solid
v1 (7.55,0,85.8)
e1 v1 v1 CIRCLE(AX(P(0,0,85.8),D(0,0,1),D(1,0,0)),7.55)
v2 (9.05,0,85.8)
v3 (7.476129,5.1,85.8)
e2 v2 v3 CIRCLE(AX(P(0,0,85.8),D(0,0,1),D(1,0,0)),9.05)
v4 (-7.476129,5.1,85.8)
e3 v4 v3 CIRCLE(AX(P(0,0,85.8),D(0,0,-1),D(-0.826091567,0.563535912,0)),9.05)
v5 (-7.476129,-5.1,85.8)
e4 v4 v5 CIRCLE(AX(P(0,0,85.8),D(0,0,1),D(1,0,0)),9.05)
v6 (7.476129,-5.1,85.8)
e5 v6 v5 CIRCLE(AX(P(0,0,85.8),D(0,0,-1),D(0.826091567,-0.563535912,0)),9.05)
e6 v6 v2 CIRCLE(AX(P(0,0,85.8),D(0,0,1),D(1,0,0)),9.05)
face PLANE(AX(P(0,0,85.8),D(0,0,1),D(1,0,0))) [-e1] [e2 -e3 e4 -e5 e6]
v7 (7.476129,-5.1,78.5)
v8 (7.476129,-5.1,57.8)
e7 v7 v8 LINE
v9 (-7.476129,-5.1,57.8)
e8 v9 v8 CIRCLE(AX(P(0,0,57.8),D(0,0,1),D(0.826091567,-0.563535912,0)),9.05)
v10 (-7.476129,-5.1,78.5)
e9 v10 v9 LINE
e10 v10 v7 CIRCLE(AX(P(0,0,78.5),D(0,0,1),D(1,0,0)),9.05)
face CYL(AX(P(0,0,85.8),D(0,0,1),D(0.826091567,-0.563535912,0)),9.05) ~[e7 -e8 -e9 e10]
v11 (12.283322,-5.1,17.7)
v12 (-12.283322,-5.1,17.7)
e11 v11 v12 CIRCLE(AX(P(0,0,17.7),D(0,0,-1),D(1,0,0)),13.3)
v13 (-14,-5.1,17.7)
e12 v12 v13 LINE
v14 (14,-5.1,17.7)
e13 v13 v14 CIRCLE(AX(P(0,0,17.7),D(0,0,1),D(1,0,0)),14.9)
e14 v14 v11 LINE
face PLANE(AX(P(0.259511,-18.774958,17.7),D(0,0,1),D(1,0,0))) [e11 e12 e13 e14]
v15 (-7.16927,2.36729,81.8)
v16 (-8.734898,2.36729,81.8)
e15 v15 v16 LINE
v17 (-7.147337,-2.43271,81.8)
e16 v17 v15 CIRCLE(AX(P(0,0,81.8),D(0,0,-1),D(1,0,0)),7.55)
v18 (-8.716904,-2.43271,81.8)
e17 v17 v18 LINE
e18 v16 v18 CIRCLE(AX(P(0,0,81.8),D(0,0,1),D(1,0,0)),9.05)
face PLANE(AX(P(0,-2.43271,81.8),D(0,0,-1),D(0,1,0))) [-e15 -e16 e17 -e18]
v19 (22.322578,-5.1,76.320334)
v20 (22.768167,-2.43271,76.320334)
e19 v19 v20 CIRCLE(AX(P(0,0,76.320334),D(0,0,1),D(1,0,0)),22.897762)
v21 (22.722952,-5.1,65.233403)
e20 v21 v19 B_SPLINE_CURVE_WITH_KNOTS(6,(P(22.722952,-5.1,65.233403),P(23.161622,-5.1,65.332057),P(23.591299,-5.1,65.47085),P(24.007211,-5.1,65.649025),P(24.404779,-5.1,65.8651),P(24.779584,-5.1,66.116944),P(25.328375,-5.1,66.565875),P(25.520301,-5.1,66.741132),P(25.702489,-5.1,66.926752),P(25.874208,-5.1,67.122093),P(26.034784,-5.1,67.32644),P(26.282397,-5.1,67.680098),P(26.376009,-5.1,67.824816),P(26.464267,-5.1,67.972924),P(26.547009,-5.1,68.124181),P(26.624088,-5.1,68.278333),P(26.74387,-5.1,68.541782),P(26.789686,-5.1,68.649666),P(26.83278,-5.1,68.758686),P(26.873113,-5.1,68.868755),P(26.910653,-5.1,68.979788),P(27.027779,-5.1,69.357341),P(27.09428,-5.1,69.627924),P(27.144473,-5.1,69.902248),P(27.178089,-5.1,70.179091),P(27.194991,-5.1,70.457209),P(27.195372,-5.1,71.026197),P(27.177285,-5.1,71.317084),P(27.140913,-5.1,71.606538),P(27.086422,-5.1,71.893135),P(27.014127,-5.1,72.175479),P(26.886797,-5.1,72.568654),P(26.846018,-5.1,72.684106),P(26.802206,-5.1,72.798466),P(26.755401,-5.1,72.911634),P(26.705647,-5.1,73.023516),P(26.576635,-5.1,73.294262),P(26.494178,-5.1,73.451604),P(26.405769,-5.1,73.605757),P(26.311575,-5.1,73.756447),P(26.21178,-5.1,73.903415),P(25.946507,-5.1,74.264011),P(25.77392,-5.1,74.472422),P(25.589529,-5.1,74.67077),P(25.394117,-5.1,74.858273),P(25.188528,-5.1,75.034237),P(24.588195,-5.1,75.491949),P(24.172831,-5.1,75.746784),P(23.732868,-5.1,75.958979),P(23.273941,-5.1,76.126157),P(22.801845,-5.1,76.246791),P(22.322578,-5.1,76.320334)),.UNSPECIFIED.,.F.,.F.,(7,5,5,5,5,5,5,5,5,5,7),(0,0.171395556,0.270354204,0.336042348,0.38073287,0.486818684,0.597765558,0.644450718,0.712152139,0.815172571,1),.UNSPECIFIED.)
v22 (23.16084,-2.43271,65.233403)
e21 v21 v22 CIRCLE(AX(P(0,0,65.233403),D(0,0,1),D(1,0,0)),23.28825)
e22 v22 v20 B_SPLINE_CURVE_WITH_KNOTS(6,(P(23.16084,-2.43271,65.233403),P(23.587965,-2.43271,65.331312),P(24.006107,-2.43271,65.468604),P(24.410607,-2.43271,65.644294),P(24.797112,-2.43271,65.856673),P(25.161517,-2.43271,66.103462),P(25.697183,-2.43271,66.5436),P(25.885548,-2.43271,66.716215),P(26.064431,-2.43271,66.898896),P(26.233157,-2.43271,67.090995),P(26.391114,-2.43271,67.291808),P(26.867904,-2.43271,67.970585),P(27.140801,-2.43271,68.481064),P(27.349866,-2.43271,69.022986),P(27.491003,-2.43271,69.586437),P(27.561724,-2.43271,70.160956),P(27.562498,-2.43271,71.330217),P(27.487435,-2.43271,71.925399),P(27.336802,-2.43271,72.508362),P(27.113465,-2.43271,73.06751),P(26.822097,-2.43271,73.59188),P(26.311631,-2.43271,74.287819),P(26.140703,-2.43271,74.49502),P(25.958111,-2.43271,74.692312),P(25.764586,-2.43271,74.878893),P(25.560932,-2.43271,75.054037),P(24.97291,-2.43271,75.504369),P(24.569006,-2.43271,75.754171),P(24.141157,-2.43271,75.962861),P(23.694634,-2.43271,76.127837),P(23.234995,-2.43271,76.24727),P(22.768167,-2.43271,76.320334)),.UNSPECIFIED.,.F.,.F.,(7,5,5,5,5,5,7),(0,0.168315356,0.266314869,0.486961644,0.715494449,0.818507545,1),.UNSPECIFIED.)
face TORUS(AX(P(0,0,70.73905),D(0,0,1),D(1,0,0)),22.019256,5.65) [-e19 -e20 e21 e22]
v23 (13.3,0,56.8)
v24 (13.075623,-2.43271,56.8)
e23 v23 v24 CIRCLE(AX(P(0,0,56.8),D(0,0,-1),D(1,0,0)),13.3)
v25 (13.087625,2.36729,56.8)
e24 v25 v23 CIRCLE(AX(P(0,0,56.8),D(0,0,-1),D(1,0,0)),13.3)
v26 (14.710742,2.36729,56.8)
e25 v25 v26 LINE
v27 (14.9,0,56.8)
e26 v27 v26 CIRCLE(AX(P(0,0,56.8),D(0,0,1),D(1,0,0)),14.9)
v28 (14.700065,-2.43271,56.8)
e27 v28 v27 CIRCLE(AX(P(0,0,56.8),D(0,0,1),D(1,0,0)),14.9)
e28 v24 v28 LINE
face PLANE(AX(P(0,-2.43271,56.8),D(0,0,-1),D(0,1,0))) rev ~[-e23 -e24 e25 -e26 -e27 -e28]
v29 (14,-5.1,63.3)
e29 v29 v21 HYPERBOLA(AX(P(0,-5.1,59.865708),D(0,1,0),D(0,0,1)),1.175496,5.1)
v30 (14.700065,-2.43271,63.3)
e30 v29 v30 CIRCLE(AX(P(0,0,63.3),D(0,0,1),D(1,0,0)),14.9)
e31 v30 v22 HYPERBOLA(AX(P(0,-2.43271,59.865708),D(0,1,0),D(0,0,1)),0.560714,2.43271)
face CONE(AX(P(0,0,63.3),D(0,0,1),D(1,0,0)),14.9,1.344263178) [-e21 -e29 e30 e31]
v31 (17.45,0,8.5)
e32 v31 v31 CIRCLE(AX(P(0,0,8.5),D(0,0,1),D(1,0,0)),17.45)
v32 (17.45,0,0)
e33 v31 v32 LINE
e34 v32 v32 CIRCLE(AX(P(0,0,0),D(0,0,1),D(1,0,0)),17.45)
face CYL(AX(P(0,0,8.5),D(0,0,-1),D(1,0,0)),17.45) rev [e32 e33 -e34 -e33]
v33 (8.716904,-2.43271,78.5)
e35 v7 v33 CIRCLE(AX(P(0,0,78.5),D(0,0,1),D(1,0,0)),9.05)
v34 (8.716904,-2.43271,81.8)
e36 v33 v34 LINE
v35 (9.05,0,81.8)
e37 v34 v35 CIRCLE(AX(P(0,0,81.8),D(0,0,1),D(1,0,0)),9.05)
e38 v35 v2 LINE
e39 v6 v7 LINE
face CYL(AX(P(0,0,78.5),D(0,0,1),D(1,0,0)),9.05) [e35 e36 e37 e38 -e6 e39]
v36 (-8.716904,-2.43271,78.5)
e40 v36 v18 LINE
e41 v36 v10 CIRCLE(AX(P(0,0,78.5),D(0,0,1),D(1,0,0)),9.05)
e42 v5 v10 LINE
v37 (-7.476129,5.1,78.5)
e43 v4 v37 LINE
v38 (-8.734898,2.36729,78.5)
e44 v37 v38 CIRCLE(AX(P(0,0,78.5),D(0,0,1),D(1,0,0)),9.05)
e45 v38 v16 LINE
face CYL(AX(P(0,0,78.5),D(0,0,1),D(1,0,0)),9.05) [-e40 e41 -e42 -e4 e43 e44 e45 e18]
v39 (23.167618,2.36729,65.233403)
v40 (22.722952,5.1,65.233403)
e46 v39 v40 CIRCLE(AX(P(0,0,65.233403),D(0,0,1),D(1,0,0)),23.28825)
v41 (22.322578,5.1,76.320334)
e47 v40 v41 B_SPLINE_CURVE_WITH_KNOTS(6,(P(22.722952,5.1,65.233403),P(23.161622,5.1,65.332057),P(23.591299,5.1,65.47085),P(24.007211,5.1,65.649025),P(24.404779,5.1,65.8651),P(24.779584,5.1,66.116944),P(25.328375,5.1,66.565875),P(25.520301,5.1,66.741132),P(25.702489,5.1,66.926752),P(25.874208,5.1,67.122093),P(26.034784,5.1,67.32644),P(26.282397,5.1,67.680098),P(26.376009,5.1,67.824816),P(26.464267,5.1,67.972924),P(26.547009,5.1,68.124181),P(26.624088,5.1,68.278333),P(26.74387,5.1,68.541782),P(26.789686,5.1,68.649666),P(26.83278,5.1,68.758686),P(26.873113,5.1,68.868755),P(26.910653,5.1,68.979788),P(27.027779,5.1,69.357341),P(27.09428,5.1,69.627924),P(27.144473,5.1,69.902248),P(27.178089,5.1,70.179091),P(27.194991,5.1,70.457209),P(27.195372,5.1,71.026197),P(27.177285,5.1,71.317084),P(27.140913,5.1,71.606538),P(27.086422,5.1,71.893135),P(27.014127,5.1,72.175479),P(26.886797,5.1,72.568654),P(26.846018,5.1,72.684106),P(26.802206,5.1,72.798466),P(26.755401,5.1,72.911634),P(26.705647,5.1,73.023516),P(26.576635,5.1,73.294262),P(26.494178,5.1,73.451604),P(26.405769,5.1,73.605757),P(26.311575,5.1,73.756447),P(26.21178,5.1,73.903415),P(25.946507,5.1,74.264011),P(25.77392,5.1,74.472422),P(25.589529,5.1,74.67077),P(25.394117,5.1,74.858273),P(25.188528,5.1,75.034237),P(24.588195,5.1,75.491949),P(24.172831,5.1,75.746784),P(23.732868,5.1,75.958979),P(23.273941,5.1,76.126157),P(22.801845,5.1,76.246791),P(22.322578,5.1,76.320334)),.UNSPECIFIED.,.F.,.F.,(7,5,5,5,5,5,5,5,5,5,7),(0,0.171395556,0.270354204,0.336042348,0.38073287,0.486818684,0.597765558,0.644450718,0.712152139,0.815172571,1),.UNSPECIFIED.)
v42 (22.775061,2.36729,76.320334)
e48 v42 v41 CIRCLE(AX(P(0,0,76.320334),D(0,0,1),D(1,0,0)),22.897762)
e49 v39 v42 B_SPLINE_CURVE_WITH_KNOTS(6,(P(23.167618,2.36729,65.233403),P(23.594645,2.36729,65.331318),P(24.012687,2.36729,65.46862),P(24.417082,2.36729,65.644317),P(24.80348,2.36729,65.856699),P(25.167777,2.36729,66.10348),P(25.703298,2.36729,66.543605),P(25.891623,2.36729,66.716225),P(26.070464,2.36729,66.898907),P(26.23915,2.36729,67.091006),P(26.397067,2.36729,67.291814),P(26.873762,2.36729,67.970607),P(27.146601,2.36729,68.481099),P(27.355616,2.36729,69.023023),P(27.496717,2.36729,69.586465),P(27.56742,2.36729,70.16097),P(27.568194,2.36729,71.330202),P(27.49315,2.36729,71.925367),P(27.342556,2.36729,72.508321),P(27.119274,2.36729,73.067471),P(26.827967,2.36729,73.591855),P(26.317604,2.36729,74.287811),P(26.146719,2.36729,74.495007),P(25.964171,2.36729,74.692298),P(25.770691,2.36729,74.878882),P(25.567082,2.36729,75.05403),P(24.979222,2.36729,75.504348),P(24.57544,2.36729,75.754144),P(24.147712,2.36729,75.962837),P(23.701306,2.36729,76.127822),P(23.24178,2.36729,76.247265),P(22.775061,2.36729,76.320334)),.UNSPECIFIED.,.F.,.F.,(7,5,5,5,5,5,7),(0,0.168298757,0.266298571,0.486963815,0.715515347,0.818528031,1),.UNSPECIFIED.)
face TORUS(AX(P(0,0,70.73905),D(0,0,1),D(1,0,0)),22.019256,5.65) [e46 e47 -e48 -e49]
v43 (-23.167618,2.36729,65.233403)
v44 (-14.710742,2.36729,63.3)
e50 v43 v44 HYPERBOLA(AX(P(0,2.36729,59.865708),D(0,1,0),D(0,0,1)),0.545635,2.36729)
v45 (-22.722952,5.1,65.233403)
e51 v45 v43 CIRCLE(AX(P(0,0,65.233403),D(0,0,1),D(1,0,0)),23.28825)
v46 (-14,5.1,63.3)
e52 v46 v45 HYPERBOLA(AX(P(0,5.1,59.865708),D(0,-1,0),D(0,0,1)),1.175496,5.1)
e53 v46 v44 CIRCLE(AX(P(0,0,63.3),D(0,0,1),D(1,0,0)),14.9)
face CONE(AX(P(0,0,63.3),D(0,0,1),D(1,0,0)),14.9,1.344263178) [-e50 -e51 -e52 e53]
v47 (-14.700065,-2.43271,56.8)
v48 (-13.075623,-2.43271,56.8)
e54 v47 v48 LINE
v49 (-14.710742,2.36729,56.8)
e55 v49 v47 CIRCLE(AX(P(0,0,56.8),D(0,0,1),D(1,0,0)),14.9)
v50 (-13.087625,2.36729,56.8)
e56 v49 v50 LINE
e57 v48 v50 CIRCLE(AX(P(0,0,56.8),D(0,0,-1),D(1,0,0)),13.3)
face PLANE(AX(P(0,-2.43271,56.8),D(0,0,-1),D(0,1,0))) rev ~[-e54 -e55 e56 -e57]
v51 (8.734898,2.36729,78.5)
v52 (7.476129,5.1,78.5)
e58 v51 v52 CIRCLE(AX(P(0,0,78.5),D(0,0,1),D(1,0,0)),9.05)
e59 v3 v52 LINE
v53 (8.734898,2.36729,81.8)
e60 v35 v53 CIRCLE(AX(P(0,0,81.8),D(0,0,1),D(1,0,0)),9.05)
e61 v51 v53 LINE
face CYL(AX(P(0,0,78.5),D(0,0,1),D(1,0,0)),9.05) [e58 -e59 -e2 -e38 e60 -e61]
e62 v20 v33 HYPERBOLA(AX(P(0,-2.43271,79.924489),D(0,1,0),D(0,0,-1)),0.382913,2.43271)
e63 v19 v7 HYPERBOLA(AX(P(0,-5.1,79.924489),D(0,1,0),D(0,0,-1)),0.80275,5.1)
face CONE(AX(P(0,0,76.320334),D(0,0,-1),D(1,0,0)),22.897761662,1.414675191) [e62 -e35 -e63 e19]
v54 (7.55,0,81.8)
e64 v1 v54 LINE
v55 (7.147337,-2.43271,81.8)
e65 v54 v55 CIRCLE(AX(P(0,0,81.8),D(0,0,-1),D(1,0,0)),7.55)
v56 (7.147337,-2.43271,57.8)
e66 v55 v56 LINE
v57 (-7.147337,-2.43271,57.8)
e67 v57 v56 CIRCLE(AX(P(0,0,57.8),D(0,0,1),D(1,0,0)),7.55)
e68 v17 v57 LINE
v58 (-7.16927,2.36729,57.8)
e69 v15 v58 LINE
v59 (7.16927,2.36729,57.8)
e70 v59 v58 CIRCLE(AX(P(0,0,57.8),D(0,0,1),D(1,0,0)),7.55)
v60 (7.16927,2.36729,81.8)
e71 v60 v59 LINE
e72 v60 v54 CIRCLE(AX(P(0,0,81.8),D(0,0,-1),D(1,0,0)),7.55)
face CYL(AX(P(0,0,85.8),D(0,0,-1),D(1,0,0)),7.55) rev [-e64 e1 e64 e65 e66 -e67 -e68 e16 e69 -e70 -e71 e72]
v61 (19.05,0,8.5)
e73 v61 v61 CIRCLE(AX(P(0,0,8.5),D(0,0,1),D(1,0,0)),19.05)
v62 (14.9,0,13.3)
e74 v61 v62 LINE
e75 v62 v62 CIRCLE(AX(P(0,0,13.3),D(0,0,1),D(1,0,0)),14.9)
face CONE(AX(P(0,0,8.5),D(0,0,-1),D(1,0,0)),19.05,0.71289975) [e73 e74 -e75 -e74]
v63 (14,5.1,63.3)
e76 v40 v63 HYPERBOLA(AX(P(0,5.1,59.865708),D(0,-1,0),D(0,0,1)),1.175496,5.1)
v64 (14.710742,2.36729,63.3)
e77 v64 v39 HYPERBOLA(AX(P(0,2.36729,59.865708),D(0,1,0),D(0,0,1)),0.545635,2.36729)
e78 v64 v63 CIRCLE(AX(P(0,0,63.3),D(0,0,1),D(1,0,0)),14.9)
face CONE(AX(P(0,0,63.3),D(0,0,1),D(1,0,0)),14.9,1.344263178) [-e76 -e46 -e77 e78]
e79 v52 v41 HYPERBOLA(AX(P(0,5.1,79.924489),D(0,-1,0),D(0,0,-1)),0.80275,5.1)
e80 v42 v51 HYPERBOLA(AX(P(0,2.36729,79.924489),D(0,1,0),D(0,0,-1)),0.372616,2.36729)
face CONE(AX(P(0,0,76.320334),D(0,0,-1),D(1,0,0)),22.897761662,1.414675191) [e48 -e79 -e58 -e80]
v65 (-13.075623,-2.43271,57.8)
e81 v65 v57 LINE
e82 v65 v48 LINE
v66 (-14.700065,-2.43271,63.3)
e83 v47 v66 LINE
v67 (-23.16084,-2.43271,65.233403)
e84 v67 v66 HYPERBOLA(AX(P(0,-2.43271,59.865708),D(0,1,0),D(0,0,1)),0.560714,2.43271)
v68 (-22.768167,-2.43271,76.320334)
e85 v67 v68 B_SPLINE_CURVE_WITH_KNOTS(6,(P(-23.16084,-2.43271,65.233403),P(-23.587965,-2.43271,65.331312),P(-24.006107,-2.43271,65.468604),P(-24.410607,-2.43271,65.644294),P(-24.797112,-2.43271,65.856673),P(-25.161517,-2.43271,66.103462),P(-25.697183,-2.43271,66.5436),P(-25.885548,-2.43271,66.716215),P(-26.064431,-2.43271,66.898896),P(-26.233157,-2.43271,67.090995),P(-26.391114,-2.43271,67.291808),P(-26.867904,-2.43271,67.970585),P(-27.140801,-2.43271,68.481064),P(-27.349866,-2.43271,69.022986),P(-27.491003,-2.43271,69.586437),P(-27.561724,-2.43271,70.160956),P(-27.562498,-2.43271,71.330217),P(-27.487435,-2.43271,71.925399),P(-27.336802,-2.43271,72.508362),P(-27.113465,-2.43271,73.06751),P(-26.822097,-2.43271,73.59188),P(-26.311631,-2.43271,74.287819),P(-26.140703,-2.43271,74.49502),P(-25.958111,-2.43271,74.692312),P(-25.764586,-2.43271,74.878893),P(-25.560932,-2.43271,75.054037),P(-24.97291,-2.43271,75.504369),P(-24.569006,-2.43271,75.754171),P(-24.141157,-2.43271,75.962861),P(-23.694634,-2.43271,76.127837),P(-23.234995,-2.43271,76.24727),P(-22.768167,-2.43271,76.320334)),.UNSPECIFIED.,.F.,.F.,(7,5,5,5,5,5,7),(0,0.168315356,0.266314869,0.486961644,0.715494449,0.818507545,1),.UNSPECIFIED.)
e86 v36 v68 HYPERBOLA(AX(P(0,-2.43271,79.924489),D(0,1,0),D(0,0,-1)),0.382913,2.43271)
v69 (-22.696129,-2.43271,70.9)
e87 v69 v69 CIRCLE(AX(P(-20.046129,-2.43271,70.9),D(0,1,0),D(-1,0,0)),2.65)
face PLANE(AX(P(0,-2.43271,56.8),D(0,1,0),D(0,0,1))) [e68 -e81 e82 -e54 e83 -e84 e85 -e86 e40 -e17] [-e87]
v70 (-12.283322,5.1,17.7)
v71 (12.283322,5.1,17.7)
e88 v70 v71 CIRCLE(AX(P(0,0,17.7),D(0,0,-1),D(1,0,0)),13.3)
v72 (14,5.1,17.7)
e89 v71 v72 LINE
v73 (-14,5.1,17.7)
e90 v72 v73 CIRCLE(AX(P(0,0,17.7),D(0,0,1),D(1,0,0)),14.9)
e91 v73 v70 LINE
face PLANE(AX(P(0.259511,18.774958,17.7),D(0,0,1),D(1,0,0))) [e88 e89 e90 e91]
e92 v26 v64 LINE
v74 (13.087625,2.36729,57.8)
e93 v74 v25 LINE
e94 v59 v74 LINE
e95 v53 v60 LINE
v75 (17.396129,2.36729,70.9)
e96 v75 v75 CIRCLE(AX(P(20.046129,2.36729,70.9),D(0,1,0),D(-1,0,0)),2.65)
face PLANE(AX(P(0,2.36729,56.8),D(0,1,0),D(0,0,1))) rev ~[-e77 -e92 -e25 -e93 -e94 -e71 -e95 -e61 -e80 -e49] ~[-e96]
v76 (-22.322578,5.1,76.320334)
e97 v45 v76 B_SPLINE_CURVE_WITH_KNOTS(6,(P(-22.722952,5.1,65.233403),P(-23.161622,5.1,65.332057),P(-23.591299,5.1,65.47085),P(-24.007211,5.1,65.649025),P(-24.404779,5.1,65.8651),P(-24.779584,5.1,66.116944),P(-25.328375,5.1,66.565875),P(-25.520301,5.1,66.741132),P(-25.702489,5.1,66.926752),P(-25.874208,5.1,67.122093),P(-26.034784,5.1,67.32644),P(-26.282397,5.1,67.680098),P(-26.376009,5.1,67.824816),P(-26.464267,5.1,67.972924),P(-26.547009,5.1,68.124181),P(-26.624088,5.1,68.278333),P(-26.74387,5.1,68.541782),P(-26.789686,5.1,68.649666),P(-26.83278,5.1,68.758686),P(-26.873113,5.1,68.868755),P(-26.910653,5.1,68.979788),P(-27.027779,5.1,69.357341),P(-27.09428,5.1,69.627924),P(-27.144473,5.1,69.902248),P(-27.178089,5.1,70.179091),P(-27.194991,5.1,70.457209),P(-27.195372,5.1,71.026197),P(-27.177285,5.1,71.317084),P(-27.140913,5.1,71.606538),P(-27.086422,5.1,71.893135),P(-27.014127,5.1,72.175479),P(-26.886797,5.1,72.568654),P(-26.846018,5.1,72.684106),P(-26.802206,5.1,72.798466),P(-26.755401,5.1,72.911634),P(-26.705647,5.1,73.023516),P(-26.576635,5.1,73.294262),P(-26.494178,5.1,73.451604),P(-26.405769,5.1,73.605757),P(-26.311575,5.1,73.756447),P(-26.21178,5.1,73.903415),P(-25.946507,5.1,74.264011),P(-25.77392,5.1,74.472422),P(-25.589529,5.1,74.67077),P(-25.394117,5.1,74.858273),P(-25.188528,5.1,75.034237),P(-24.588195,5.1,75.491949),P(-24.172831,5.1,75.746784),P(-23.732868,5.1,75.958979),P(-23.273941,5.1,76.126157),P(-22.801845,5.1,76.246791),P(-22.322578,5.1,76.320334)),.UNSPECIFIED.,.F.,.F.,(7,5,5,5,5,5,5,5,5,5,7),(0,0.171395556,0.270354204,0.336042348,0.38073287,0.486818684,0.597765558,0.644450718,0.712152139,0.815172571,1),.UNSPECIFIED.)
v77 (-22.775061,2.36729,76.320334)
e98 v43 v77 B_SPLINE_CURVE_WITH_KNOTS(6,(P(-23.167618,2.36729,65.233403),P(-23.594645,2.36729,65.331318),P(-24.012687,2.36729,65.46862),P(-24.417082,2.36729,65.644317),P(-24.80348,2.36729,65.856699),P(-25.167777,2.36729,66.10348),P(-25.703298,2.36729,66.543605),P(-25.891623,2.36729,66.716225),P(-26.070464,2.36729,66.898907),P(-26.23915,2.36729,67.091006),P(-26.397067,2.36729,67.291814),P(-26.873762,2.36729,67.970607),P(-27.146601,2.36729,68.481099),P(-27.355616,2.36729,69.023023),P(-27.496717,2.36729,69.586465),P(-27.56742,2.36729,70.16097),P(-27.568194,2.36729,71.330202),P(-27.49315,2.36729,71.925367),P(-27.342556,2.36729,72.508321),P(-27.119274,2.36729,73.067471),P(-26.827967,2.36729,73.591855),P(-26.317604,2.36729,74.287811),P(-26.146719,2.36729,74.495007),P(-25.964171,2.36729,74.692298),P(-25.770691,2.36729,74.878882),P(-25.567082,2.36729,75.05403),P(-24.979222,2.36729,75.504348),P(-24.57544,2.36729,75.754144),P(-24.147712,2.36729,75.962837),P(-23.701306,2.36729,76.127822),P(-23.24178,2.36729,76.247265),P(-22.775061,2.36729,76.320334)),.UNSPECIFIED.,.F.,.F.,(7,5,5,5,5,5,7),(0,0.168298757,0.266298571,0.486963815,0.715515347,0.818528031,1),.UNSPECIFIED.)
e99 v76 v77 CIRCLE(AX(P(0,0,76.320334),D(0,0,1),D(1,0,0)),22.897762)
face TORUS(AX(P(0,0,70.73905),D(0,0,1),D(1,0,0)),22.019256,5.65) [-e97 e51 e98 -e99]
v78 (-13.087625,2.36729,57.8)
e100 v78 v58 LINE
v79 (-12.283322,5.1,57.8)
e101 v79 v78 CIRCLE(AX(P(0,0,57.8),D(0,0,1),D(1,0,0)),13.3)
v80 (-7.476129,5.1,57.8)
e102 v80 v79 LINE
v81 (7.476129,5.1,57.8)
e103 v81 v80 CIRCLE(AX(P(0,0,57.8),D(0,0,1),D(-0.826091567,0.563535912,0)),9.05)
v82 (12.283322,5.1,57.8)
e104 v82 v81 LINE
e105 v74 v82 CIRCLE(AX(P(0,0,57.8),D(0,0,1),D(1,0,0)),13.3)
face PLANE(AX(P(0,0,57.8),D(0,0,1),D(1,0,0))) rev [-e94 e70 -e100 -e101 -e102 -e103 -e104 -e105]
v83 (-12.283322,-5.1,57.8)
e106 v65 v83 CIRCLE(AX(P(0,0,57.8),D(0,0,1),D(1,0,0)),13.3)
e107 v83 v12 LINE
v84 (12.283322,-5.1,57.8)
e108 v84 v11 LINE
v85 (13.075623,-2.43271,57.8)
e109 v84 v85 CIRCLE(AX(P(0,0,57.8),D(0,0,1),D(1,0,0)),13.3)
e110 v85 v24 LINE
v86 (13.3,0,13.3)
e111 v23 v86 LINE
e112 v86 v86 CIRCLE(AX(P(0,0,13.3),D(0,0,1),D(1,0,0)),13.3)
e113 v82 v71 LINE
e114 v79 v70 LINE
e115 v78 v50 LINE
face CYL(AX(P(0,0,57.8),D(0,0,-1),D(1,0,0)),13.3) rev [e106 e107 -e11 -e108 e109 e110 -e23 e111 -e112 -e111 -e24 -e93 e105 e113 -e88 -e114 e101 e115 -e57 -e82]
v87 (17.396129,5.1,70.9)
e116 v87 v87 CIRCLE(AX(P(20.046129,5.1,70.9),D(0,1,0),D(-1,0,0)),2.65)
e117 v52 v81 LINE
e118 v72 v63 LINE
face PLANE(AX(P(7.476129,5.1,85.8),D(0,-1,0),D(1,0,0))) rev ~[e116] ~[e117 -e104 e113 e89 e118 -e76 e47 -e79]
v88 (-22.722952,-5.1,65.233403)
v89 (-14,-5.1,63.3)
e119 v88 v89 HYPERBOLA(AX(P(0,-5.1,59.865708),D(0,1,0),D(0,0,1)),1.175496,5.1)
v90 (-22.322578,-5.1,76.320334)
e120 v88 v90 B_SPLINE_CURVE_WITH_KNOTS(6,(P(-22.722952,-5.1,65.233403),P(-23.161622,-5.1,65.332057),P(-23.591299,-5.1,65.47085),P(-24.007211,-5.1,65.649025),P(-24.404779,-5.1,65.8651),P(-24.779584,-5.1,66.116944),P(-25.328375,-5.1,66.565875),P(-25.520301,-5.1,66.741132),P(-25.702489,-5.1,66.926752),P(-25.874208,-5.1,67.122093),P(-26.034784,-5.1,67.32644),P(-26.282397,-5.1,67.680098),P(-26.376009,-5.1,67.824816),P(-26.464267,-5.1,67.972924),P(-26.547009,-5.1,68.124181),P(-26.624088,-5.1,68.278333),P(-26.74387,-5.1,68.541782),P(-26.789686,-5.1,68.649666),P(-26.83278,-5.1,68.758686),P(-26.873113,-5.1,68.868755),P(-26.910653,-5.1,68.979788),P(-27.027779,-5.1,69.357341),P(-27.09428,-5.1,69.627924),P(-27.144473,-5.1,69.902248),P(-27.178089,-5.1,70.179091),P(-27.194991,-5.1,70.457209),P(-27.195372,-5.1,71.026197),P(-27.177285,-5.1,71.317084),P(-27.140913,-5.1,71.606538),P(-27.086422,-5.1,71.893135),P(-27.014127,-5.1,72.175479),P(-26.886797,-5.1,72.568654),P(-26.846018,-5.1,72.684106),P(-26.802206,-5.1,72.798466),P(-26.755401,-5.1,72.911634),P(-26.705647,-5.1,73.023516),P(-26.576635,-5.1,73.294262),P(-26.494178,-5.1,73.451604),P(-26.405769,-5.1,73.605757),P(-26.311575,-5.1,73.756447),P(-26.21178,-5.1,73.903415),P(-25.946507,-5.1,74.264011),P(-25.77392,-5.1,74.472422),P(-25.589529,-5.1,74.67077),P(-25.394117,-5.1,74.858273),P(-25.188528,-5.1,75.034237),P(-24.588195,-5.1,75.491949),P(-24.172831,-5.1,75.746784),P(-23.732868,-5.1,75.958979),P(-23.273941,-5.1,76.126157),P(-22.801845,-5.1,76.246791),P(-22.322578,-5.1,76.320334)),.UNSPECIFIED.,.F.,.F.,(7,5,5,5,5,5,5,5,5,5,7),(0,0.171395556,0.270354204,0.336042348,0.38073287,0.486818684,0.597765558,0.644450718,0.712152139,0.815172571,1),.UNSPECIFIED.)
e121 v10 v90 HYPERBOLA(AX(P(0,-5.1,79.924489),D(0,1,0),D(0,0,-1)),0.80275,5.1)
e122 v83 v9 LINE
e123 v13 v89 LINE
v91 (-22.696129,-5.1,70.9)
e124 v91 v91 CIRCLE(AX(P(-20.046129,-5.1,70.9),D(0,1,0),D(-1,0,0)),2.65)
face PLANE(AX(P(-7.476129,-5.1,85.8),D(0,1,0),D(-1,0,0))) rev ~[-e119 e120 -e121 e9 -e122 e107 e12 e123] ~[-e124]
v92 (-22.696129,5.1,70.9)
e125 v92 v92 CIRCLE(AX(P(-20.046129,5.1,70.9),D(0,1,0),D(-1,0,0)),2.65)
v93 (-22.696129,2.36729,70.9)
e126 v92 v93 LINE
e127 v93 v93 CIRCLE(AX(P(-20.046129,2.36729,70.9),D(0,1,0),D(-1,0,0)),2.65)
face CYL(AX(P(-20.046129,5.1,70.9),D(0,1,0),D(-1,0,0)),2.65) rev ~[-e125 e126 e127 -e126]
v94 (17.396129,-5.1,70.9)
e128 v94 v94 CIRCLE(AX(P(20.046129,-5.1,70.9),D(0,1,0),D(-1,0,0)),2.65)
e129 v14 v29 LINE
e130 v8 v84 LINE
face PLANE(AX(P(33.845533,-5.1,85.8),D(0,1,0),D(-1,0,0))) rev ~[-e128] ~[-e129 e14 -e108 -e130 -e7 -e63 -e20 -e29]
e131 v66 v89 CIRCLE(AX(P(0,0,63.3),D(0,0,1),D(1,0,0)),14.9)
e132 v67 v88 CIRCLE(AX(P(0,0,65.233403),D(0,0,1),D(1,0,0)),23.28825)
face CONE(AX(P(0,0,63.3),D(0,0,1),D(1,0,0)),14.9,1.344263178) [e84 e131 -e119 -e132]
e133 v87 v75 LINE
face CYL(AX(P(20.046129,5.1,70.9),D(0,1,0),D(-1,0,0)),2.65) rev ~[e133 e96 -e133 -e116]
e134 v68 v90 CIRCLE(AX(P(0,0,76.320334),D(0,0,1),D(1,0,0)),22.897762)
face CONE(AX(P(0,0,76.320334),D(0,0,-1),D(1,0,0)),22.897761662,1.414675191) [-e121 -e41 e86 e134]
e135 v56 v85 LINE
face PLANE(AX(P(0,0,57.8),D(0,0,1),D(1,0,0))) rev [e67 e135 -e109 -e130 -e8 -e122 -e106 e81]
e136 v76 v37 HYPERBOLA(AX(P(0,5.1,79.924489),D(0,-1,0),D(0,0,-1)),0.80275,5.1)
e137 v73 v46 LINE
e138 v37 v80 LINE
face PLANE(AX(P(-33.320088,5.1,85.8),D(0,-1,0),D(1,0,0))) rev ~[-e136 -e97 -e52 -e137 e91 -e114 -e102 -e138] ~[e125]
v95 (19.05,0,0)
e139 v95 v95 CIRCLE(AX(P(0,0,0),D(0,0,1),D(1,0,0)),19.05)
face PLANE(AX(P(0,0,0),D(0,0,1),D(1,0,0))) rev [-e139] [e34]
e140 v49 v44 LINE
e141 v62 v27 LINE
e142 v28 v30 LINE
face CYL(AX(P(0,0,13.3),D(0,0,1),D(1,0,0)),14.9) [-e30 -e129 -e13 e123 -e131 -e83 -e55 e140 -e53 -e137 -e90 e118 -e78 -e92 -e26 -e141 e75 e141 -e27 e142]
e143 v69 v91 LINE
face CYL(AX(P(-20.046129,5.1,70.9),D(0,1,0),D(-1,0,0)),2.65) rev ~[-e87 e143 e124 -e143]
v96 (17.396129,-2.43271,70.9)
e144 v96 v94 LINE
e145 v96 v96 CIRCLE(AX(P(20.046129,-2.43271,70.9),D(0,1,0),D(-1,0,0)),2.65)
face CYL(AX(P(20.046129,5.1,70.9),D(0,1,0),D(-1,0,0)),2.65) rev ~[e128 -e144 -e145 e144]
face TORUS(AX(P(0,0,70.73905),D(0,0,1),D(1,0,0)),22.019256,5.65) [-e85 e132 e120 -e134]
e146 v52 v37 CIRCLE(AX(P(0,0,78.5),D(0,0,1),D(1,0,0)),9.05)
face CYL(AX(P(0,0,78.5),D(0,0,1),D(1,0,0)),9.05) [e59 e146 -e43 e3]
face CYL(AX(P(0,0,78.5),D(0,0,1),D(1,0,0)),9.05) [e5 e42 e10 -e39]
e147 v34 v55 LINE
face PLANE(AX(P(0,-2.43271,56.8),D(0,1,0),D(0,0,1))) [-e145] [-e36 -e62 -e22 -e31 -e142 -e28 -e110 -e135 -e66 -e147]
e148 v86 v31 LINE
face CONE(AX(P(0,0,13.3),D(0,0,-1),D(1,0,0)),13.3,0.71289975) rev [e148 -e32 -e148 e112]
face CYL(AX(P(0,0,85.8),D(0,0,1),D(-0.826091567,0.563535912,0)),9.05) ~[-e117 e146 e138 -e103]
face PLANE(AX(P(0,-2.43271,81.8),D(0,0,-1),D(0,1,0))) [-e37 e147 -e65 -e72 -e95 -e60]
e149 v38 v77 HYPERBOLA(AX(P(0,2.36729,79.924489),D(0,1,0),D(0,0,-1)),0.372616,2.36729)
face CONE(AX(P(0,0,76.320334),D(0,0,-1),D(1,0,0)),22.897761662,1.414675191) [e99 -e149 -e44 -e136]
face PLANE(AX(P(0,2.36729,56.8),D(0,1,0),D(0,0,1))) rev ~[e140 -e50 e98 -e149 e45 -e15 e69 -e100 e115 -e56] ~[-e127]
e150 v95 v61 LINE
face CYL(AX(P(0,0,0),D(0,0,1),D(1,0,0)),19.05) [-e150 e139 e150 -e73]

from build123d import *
from build123d import SkipClean  # not in build123d's __all__

# Parameters (mm, degrees)
F3_DEPTH = 68.1
F4_W     = 4.8
F4_H     = 25
F5_DEPTH = 41.80857
F6_R     = 2.65
F7_DEPTH = 25


with BuildPart() as f1:
    # F0 (on Front) → F1 (revolve)
    with BuildSketch(Plane.XZ):
        with BuildLine():
            Line((17.45, 8.5), (17.45, 0))
            Line((17.45, 0), (19.05, 0))
            Line((19.05, 0), (19.05, 8.5))
            Line((19.05, 8.5), (14.9, 13.3))
            Line((14.9, 13.3), (14.9, 63.3))
            Line((14.9, 63.3), (23.2882495839, 65.2334026039))
            ThreePointArc((23.2882495839, 65.2334026039), (27.6657550526, 70.9379230726), (22.8977616622, 76.3203339576))
            Line((22.8977616622, 76.3203339576), (9.05, 78.5))
            Line((9.05, 78.5), (9.05, 85.8))
            Line((9.05, 85.8), (7.55, 85.8))
            Line((7.55, 85.8), (7.55, 57.8))
            Line((7.55, 57.8), (13.3, 57.8))
            Line((13.3, 57.8), (13.3, 13.3))
            Line((13.3, 13.3), (17.45, 8.5))
        make_face()
    revolve(axis=Axis((0, 0, 43.5625389218), (0, 0, 1)))

    # F2 (on face) → F3 (cut)
    with BuildSketch(Plane.XY.offset(85.8)):
        with BuildLine():
            ThreePointArc((7.4761286773, -5.1), (0, -9.05), (-7.4761286773, -5.1))
            Line((-7.4761286773, -5.1), (-33.3200879395, -5.1))
            Line((-33.3200879395, -5.1), (-33.3200879395, -32.3637121379))
            Line((-33.3200879395, -32.3637121379), (33.8455328711, -32.3637121379))
            Line((33.8455328711, -32.3637121379), (33.8455328711, -5.1))
            Line((33.8455328711, -5.1), (7.4761286773, -5.1))
        make_face()
        with BuildLine():
            Line((7.4761286773, 5.1), (33.8455328711, 5.1))
            Line((33.8455328711, 5.1), (33.8455328711, 32.3637121379))
            Line((33.8455328711, 32.3637121379), (-33.3200879395, 32.3637121379))
            Line((-33.3200879395, 32.3637121379), (-33.3200879395, 5.1))
            Line((-33.3200879395, 5.1), (-7.4761286773, 5.1))
            ThreePointArc((-7.4761286773, 5.1), (0, 9.05), (7.4761286773, 5.1))
        make_face()
    with SkipClean():  # cleaning this boolean's faces spoils the solid; the shape is the same uncleaned
        extrude(amount=-F3_DEPTH, mode=Mode.SUBTRACT)

    # F4 (on Right) → F5 (cut, symmetric)
    with BuildSketch(Plane.YZ):
        with Locations((-0.0327096786, 69.3)):
            Rectangle(F4_W, F4_H)
    extrude(amount=F5_DEPTH, both=True, mode=Mode.SUBTRACT)

    # F6 (on face) → F7 (cut)
    with BuildSketch(Plane(origin=(0, 5.1, 0), x_dir=(-1, 0, 0), z_dir=(0, 1, 0))):
        with Locations((-20.0461286773, 70.9)):
            Circle(F6_R)
        with Locations((20.0461286773, 70.9)):
            Circle(F6_R)
    extrude(amount=-F7_DEPTH, mode=Mode.SUBTRACT)


solid = f1.part
